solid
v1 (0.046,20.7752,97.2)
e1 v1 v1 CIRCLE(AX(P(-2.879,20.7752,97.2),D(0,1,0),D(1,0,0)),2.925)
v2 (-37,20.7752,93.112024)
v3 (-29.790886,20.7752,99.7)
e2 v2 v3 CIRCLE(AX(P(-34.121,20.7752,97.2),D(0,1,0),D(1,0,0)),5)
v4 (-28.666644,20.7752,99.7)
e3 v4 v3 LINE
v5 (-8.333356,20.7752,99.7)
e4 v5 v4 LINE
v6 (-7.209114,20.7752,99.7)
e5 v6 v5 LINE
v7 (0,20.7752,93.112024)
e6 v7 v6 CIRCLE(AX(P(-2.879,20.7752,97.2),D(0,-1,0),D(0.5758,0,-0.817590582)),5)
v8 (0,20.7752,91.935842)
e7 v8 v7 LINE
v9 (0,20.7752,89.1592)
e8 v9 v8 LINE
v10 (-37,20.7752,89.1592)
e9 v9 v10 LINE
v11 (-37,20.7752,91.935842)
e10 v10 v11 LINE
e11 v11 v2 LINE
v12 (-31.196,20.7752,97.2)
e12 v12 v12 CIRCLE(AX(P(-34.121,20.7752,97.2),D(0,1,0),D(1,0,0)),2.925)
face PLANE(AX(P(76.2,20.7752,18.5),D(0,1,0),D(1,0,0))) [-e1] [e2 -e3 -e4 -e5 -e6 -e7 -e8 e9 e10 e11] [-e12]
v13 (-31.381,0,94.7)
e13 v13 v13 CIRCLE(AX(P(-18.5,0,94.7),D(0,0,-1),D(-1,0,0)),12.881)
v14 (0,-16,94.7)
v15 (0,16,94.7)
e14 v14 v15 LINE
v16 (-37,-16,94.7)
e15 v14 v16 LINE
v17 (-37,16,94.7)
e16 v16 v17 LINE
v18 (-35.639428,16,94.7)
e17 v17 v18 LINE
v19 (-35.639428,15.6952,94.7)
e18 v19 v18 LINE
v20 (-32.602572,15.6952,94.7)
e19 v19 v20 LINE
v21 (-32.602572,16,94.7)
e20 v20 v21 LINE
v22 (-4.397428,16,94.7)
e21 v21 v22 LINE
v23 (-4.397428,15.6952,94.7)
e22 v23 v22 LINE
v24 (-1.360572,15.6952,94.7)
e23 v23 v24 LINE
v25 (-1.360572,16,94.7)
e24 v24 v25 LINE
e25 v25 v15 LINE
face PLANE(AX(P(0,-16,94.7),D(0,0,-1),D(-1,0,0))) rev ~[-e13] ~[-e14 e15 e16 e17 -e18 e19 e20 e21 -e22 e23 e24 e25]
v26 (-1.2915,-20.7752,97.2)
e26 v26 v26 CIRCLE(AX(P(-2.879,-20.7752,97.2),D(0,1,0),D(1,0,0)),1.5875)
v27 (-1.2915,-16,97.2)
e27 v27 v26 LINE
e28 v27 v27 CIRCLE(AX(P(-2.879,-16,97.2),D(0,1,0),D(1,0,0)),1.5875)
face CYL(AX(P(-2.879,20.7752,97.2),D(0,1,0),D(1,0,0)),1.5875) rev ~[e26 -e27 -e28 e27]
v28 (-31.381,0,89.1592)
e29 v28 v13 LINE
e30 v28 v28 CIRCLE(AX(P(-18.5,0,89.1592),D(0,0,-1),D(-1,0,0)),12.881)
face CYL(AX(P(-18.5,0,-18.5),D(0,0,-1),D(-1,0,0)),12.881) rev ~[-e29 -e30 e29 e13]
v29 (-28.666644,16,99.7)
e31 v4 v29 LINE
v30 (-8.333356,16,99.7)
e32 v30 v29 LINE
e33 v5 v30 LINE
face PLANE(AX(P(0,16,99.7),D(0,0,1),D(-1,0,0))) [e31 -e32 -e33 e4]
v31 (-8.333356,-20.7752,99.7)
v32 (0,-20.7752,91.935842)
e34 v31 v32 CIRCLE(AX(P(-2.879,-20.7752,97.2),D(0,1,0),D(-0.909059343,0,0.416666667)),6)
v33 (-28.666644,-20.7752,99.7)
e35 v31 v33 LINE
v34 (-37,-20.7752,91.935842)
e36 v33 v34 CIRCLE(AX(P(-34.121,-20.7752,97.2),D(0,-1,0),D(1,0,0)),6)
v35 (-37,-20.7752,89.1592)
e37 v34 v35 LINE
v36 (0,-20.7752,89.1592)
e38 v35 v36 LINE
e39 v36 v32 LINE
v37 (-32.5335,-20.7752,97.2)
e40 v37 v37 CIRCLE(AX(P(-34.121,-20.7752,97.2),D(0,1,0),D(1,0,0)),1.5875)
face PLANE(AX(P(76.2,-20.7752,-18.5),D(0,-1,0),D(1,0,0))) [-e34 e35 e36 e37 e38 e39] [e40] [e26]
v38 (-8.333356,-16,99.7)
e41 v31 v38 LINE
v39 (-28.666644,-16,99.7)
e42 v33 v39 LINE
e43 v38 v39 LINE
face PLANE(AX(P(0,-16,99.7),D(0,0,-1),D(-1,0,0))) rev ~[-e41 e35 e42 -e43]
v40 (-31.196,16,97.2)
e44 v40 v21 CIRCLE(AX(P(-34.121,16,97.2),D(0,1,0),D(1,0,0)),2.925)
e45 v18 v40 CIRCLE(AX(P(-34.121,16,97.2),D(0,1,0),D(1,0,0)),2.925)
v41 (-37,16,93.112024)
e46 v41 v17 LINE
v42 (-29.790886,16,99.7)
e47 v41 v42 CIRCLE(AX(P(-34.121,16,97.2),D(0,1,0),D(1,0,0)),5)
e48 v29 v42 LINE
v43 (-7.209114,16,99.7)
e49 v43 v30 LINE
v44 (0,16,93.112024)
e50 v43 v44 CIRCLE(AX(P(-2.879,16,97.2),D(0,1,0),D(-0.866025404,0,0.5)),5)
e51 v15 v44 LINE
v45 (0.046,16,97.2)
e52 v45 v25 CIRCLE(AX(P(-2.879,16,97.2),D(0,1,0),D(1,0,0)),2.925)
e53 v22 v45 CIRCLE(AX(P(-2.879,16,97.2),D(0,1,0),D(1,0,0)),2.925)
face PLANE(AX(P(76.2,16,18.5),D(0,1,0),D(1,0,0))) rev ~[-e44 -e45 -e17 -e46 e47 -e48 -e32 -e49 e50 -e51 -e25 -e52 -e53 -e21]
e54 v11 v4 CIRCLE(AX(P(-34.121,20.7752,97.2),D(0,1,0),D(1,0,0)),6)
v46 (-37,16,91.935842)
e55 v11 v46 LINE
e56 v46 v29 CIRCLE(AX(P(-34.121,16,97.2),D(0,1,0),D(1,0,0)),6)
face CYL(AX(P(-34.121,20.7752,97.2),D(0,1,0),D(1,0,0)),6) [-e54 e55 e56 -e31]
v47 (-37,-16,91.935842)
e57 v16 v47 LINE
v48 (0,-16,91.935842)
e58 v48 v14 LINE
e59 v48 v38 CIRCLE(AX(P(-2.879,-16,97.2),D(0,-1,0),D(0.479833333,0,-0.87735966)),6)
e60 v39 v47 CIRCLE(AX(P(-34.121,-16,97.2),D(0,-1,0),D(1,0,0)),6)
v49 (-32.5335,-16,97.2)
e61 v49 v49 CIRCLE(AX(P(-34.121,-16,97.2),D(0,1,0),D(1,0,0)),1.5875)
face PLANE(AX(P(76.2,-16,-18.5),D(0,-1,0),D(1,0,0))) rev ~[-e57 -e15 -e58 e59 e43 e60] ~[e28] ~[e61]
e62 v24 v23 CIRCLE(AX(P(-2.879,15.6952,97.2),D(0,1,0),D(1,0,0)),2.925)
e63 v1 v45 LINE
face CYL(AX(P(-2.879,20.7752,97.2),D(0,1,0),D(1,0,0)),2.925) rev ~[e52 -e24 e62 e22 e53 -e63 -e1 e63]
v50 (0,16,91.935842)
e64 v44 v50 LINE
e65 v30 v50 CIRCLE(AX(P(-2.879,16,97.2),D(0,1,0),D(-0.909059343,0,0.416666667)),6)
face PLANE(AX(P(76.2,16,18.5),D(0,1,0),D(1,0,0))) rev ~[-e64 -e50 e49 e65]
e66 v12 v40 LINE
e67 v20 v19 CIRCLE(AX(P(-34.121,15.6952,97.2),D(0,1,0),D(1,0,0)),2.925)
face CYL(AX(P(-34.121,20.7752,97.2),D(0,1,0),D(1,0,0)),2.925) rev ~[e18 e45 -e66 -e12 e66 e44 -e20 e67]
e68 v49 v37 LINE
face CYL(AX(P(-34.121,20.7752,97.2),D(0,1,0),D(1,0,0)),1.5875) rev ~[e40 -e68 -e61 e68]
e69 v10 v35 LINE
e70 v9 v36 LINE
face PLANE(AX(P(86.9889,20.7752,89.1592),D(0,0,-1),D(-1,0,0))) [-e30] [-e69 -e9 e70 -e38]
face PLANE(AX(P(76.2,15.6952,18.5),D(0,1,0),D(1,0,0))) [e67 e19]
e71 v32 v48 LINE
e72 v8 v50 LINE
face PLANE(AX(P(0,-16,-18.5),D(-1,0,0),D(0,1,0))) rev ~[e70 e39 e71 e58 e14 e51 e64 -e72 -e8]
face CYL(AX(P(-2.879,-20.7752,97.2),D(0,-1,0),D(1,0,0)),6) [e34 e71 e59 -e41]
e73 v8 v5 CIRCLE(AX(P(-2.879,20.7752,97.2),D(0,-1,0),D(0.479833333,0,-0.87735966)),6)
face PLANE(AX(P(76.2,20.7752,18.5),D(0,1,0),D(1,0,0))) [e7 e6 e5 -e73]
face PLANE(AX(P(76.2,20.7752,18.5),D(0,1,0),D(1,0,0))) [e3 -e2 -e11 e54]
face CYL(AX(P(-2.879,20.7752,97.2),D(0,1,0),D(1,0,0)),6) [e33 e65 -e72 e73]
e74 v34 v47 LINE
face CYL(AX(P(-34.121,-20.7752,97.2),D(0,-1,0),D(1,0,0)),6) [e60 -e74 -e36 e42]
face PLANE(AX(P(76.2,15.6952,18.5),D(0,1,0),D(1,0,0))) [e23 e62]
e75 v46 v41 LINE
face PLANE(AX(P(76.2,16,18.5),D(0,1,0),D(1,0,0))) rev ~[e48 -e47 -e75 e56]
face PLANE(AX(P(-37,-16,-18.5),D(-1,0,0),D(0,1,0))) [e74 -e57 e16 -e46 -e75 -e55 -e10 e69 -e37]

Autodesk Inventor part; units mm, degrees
ref_plane "YZ Plane" through (0, 0, 0) normal (1, 0, 0) x (0, 1, 0)
ref_plane "XZ Plane" through (0, 0, 0) normal (0, 1, 0) x (-1, 0, 0)
ref_plane "XY Plane" through (0, 0, 0) normal (0, 0, 1) x (1, 0, 0)
sketch "Sketch2" plane through (0, 0, 0) normal (1, 0, 0) x (0, 1, 0)
  circle A0 centre (0, 0) radius 12.881
  line L0 (-16, -18.5) -> (16, -18.5)
  line L1 (16, -18.5) -> (16, 18.5)
  line L2 (16, 18.5) -> (-16, 18.5)
  line L3 (-16, 18.5) -> (-16, -18.5)
  line L4 (-16, -18.5) -> (16, 18.5) construction
  line L5 (16, -18.5) -> (-16, 18.5) construction
  dimension "d9" = 25.762
  dimension "d10" = 32
  dimension "d11" = 37
extrude "Extrusion2" add sketch "Sketch2" along normal blind 76.2
sketch "Sketch3" plane through (0, -16, -18.5) normal (0, 0, -1) x (-1, 0, 0)
  line L0 (0, 0) -> (0, 32) projected
  circle A0 centre (18.5, 16) radius 12.881
  line L1 (0, 32) -> (0, 0)
  line L2 (0, 0) -> (37, 0)
  line L3 (37, 0) -> (37, 32)
  line L4 (37, 32) -> (0, 32)
  line L5 (0, 32) -> (37, 0) construction
  line L6 (0, 0) -> (37, 32) construction
  point P0 (0, 16)
  dimension "d14" = 25.762
  dimension "d15" = 32
  dimension "d16" = 37
extrude "Extrusion3" add sketch "Sketch3" against normal blind 113.2
sketch "Sketch4" plane through (76.2, -16, -18.5) normal (0, 0, -1) x (-1, 0, 0)
  circle A0 centre (94.7, 16) radius 12.881 projected
  point P0 (76.2, 16)
extrude "Extrusion4" add sketch "Sketch4" against normal blind 37
sketch "Sketch5" plane through (76.2, 16, 18.5) normal (0, 1, 0) x (1, 0, 0)
  line L0 (-113.2, 37) -> (0, 37) projected
  line L1 (-113.2, 37) -> (-113.2, -76.2) projected
  line L2 (-113.2, 37) -> (-100.1185, 50.0815)
  line L3 (-113.2, 37) -> (-94.7, 37) construction
  line L4 (-113.2, 37) -> (-126.2815, 23.9185)
  line L5 (-113.2, 37) -> (-94.7, 37) construction
  line L6 (-100.1185, 50.0815) -> (-154.0001, 103.963)
  line L7 (-126.2815, 23.9185) -> (-180.163, 77.8001)
  line L8 (-126.2815, 23.9185) -> (-50.0815, 23.9185) construction
  line L9 (-154.0001, 103.963) -> (-180.163, 77.8001)
  line L10 (-100.1185, 50.0815) -> (-87.037, 37)
  line L11 (-126.2815, 23.9185) -> (-113.2, 10.837)
  point P0 (-76.2, 18.5)
  dimension "d21" = 18.5
  dimension "d22" = 45
  dimension "d23" = 18.5
  dimension "d24" = 135
  dimension "d25" = 76.2
  dimension "d26" = 76.2
  dimension "d27" = 135
extrude "Extrusion5" add sketch "Sketch5" against normal blind 32
sketch "Sketch7" plane through (-77.8001, -16, -85.463) normal (-0.7071068, 0, -0.7071068) x (-0.7071068, 0, 0.7071068)
  line L0 (36.4256, 0.4968) -> (36.4256, 31.5032)
  line L1 (36.4256, 31.5032) -> (0.5744, 31.5032)
  line L2 (0.5744, 31.5032) -> (0.5744, 0.4968)
  line L3 (0.5744, 0.4968) -> (36.4256, 0.4968)
  circle A0 centre (18.5, 16) radius 12.881
  point P0 (5.4185, 16)
  point P1 (36.4256, 16)
  dimension "d131" = 25.762
extrude "Extrusion6" cut sketch "Sketch7" against normal blind 101.6 contours A0
sketch "Sketch8" plane through (76.2, 16, 18.5) normal (0, 1, 0) x (1, 0, 0)
  line L0 (-76.2, 0) -> (0, 0) projected
  line L1 (-87.037, 37) -> (0, 37) projected
  line L2 (-87.037, 37) -> (-154.0001, 103.963) projected
  line L3 (-180.163, 77.8001) -> (-113.2, 10.837) projected
  line L4 (-113.2, 10.837) -> (-113.2, -76.2) projected
  line L5 (-76.2, 0) -> (-76.2, -76.2) projected
  line L6 (0, 37) -> (5, 37)
  line L7 (5, 37) -> (5, 0)
  line L8 (5, 0) -> (0, 0)
  line L9 (0, 0) -> (0, 37)
  line L10 (-113.2, -76.2) -> (-76.2, -76.2)
  line L11 (-76.2, -76.2) -> (-76.2, -81.2)
  line L12 (-76.2, -81.2) -> (-113.2, -81.2)
  line L13 (-113.2, -81.2) -> (-113.2, -76.2)
  line L14 (-180.163, 77.8001) -> (-183.6985, 81.3356)
  line L15 (-183.6985, 81.3356) -> (-157.5356, 107.4985)
  line L16 (-157.5356, 107.4985) -> (-154.0001, 103.963)
  point P0 (-76.2, 18.5)
  dimension "d32" = 5
  dimension "d33" = 5
  dimension "d34" = 5
  dimension "d35" = 90
extrude "Extrusion7" add sketch "Sketch8" along normal blind 4.7752
sketch "Sketch9" plane through (76.2, -16, -18.5) normal (0, -1, 0) x (1, 0, 0)
  line L0 (-87.037, 0) -> (0, 0) projected
  line L1 (-76.2, 37) -> (0, 37) projected
  line L2 (-76.2, 37) -> (-76.2, 113.2) projected
  line L3 (-113.2, 26.163) -> (-113.2, 113.2) projected
  line L4 (-113.2, 26.163) -> (-180.163, -40.8001) projected
  line L5 (-154.0001, -66.963) -> (-87.037, 0) projected
  line L6 (-76.2, 118.2) -> (-76.2, 37) projected
  line L7 (-113.2, 113.2) -> (-76.2, 113.2)
  line L8 (-76.2, 113.2) -> (-76.2, 118.2)
  line L9 (-76.2, 118.2) -> (-113.2, 118.2)
  line L10 (-113.2, 118.2) -> (-113.2, 113.2)
  line L11 (-76.2, 37) -> (5, 37) projected
  line L12 (0, 0) -> (5, 0)
  line L13 (5, 0) -> (5, 37)
  line L14 (5, 37) -> (0, 37)
  line L15 (0, 37) -> (0, 0)
  line L16 (-183.6985, -44.3356) -> (-113.2, 26.163) projected
  line L17 (-180.163, -40.8001) -> (-183.6985, -44.3356)
  line L18 (-183.6985, -44.3356) -> (-157.5356, -70.4985)
  line L19 (-157.5356, -70.4985) -> (-154.0001, -66.963)
  point P0 (-76.2, 18.5)
extrude "Extrusion8" add sketch "Sketch9" along normal blind 4.7752
sketch "Sketch10" plane through (76.2, 20.7752, 18.5) normal (0, 1, 0) x (1, 0, 0)
  circle A0 centre (2.5, 34.4385) radius 1.5875
  circle A1 centre (2.5, 2.5615) radius 1.5875
  line L0 (0, 37.0615) -> (0, 0.0615)
  line L1 (0, 0.0615) -> (5, 0.0615)
  line L2 (5, 37.0615) -> (5, 0.0615)
  line L3 (0, 37.0615) -> (5, 37.0615)
  line L4 (5, 0) -> (5, 37) projected
  line L5 (0, 18.5) -> (5, 18.5)
  point P0 (-76.2, 18.5)
  dimension "d143" = 15.9385
  dimension "d144" = 2.5
  dimension "d145" = 2.5
  dimension "d146" = 15.9385
extrude "Extrusion9" cut sketch "Sketch10" against normal blind 279.4 contours A0 | A1
sketch "Sketch11" plane through (76.2, 20.7752, 18.5) normal (0, 1, 0) x (1, 0, 0)
  circle A0 centre (-79.079, -78.7) radius 1.5875
  circle A1 centre (-110.321, -78.7) radius 1.5875
  line L0 (-76.579, -76.2) -> (-113.579, -76.2)
  line L1 (-113.579, -76.2) -> (-113.579, -81.2)
  line L2 (-76.579, -81.2) -> (-113.579, -81.2)
  line L3 (-76.579, -76.2) -> (-76.579, -81.2)
  circle A2 centre (-157.6226, 103.876) radius 1.778
  circle A3 centre (-180.163, 81.3356) radius 1.778
  line L4 (-157.5791, 107.4551) -> (-183.742, 81.2921)
  line L5 (-183.742, 81.2921) -> (-180.2065, 77.7566)
  line L6 (-154.0435, 103.9195) -> (-180.2065, 77.7566)
  line L7 (-157.5791, 107.4551) -> (-154.0435, 103.9195)
  line L8 (-157.5356, 107.4985) -> (-183.6985, 81.3356) projected
  line L9 (-170.6606, 94.3736) -> (-167.125, 90.838)
  line L10 (-113.2, -81.2) -> (-76.2, -81.2) projected
  line L11 (-94.7, -76.2) -> (-94.7, -81.2)
  point P0 (-76.2, 18.5)
  dimension "d147" = 2.5
  dimension "d148" = 2.5
  dimension "d149" = 15.9385
  dimension "d150" = 15.9385
  dimension "d151" = 2.5
  dimension "d152" = 2.5
  dimension "d153" = 15.621
  dimension "d154" = 15.621
  dimension "d175" = 3.556
  dimension "d176" = 3.556
extrude "Extrusion10" cut sketch "Sketch11" against normal blind 279.4 contours A0 | A1 | A2 | A3
fillet "Fillet1" radius 3.175 3 edges at (-10.837, 0, -18.5) (0, 0, 18.5) (-37, 0, 7.663)
sketch "Sketch13" plane through (76.2, 20.7752, 18.5) normal (0, 1, 0) x (1, 0, 0)
  line L0 (-157.5356, 107.4985) -> (-183.6985, 81.3356) projected
  line L1 (-113.2, -81.2) -> (-76.2, -81.2) projected
  line L2 (5, 0) -> (5, 37) projected
  line L3 (5, 37) -> (5, 0) projected
  line L4 (5, 18.5) -> (-120.863, 18.5)
  line L5 (-114.1299, 11.767) -> (-183.6985, 81.3356) projected
  line L6 (-76.2, -81.2) -> (-113.2, -81.2) projected
  line L7 (-94.7, -81.2) -> (-95.2395, 19.0395)
  line L8 (-104.3477, 9.9312) -> (-86.1312, 28.1477) projected
  line L9 (-95.2395, 19.0395) -> (-170.6171, 94.4171)
  line L10 (-183.6985, 81.3356) -> (-157.5356, 107.4985) projected
  circle A0 centre (-14.05, 18.5) radius 6.35
  circle A1 centre (-39.45, 18.5) radius 6.35
  circle A2 centre (-64.85, 18.5) radius 6.35
  circle A3 centre (-90.25, 18.5) radius 6.35
  circle A4 centre (-94.8025, -62.15) radius 6.35
  circle A5 centre (-94.9392, -36.7504) radius 6.35
  circle A6 centre (-95.0759, -11.3507) radius 6.35
  circle A7 centre (-95.2126, 14.0489) radius 6.35
  circle A8 centre (-157.1467, 80.9467) radius 6.35
  circle A9 centre (-139.1862, 62.9862) radius 6.35
  circle A10 centre (-121.2257, 45.0257) radius 6.35
  circle A11 centre (-103.2651, 27.0651) radius 6.35
  point P0 (-76.2, 18.5)
  point P1 (-95.1101, -5.0008)
  point P2 (-95.0418, -17.7006)
  point P3 (-94.9734, -30.4005)
  point P4 (-94.9051, -43.1003)
  dimension "d60" = 12.7
  dimension "d61" = 19.05
  dimension "d64" = 25.4
  dimension "d69" = 12.7
  dimension "d70" = 19.05
  dimension "d73" = 25.4
  dimension "d78" = 12.7
  dimension "d79" = 19.05
  dimension "d82" = 25.4
extrude "Extrusion12" cut sketch "Sketch13" against normal blind 127 contours A8 L9 | L9 A8 | A9 L9 | L9 A9 | A11 L9 | L9 A11 | A10 L9 | L9 A10 | A0 L4 | L4 A0 | A1 L4 | L4 A1 | A2 L4 | L4 A2 | A4 L7 | L7 A4 | A5 L7 | L7 A5 | A6 L7 | L7 A6
sketch "Sketch14" plane through (81.2, 16, -18.5) normal (0, 0, -1) x (-1, 0, 0)
  line L0 (0, 4.7752) -> (90.7219, 4.7752) projected
  line L1 (0, 0) -> (0, 4.7752) projected
  circle A0 centre (19.05, -16) radius 6.35
  circle A1 centre (44.45, -16) radius 6.35
  circle A2 centre (69.85, -16) radius 6.35
  point P0 (81.2, -16)
  dimension "d89" = 12.7
  dimension "d91" = 19.05
  dimension "d94" = 25.4
extrude "Extrusion13" cut sketch "Sketch14" against normal blind 50.8
sketch "Sketch15" plane through (-37, 16, 94.7) normal (-1, 0, 0) x (0, 0, 1)
  line L0 (5, 0) -> (5, 4.7752) projected
  line L1 (-85.7219, 4.7752) -> (5, 4.7752) projected
  circle A0 centre (-14.05, -16) radius 6.35
  circle A1 centre (-39.45, -16) radius 6.35
  circle A2 centre (-64.85, -16) radius 6.35
  point P0 (-94.7, -16)
  dimension "d101" = 12.7
  dimension "d102" = 19.05
  dimension "d105" = 25.4
extrude "Extrusion14" cut sketch "Sketch15" against normal blind 50.8
sketch "Sketch16" plane through (-107.4985, 16, -62.8356) normal (-0.7071068, 0, 0.7071068) x (0.7071068, 0, 0.7071068)
  line L0 (0, 4.7752) -> (98.3849, 4.7752) projected
  line L1 (0, 0) -> (0, 4.7752) projected
  circle A0 centre (19.05, -16) radius 6.35
  circle A1 centre (44.45, -16) radius 6.35
  circle A2 centre (69.85, -16) radius 6.35
  point P0 (120.4444, -16)
  dimension "d112" = 12.7
  dimension "d113" = 19.05
  dimension "d116" = 25.4
extrude "Extrusion15" cut sketch "Sketch16" against normal blind 101.6
sketch "Sketch19" plane through (76.2, 20.7752, 18.5) normal (0, 1, 0) x (1, 0, 0)
  circle A0 centre (-157.6226, 103.876) radius 1.778 projected
  circle A1 centre (-79.079, -78.7) radius 1.5875 projected
  circle A2 centre (-180.163, 81.3356) radius 1.778 projected
  circle A3 centre (-110.321, -78.7) radius 1.5875 projected
  circle A4 centre (2.5, 2.5615) radius 1.5875 projected
  circle A5 centre (2.5, 34.4385) radius 1.5875 projected
  line L0 (-87.967, 37.9299) -> (-157.5356, 107.4985) projected
  line L1 (-157.5356, 107.4985) -> (-183.6985, 81.3356) projected
  line L2 (-183.6985, 81.3356) -> (-114.1299, 11.767) projected
  line L3 (-113.2, 9.5219) -> (-113.2, -81.2) projected
  line L4 (-113.2, -81.2) -> (-76.2, -81.2) projected
  line L5 (-76.2, -81.2) -> (-76.2, -3.175) projected
  line L6 (-73.025, 0) -> (5, 0) projected
  line L7 (5, 0) -> (5, 37) projected
  line L8 (5, 37) -> (-85.7219, 37) projected
  circle A6 centre (2.5, 2.5615) radius 5
  circle A7 centre (2.5, 34.4385) radius 5
  circle A8 centre (-110.321, -78.7) radius 5
  circle A9 centre (-79.079, -78.7) radius 5
  circle A10 centre (-180.163, 81.3356) radius 5
  circle A11 centre (-157.6226, 103.876) radius 5
  point P0 (-76.2, 18.5)
  point P1 (-76.2, -74.612)
  point P2 (-83.4091, -81.2)
  point P3 (-113.2, -74.612)
  point P4 (-105.9909, -81.2)
  point P5 (-178.8689, 86.1652)
  point P6 (-178.8689, 76.506)
  point P7 (-152.7579, 102.7208)
  point P8 (-162.4522, 102.5819)
  point P9 (5, 6.8916)
  point P10 (-1.794, 0)
  point P11 (-1.794, 37)
  point P12 (5, 30.1084)
  dimension "d132" = 10
  dimension "d133" = 10
  dimension "d134" = 10
  dimension "d135" = 10
  dimension "d136" = 10
  dimension "d137" = 10
extrude "Extrusion17" add sketch "Sketch19" against normal blind 4.7752 contours L0 L1 A11 | L1 L2 A10 | L3 L4 A8 | L4 L5 A9 | L6 L7 A6 | L7 L8 A7 picked at (-160.8698, 104.621) picked at (-180.881, 84.6119) picked at (-108.6315, -81.5172) picked at (-80.7689, -81.5168) picked at (0.7108, -0.3118) picked at (0.7108, 37.3118)
sketch "Sketch20" plane through (76.2, -20.7752, -18.5) normal (0, -1, 0) x (1, 0, 0)
  circle A0 centre (-157.6226, -66.876) radius 1.778 projected
  circle A1 centre (-180.163, -44.3356) radius 1.778 projected
  circle A2 centre (2.5, 34.4385) radius 1.5875 projected
  circle A3 centre (2.5, 2.5615) radius 1.5875 projected
  line L0 (-157.5356, -70.4985) -> (-87.967, -0.9299) projected
  line L1 (-85.7219, 0) -> (5, 0) projected
  line L2 (5, 0) -> (5, 37) projected
  line L3 (5, 37) -> (-73.025, 37) projected
  line L4 (-76.2, 40.175) -> (-76.2, 118.2) projected
  line L5 (-76.2, 118.2) -> (-113.2, 118.2) projected
  line L6 (-113.2, 118.2) -> (-113.2, 27.4781) projected
  line L7 (-114.1299, 25.233) -> (-183.6985, -44.3356) projected
  line L8 (-183.6985, -44.3356) -> (-157.5356, -70.4985) projected
  circle A4 centre (-157.6226, -66.876) radius 5
  circle A5 centre (-180.163, -44.3356) radius 5
  circle A6 centre (-110.321, 115.7) radius 1.5875 projected
  circle A7 centre (-110.321, 115.7) radius 6
  circle A8 centre (-79.079, 115.7) radius 1.5875 projected
  circle A9 centre (-79.079, 115.7) radius 6
  circle A10 centre (2.5, 34.4385) radius 5
  circle A11 centre (2.5, 2.5615) radius 5
  point P0 (-76.2, 18.5)
  point P1 (5, 6.8916)
  point P2 (-1.794, 0)
  point P3 (-1.794, 37)
  point P4 (5, 30.1084)
  point P5 (-84.5334, 118.2)
  point P6 (-76.2, 110.4358)
  point P7 (-104.8666, 118.2)
  point P8 (-113.2, 110.4358)
  point P9 (-162.4522, -65.5819)
  point P10 (-152.7579, -65.7208)
  point P11 (-178.8689, -39.506)
  point P12 (-178.8689, -49.1652)
  dimension "d173" = 12
  dimension "d174" = 12
extrude "Extrusion18" add sketch "Sketch20" against normal blind 4.7752 contours L0 A4 L8 | L1 L2 A11 | L2 L3 A10 | L4 L5 A9 | L5 L6 A7 | L7 L8 A5 picked at (-160.8698, -67.621) picked at (0.7108, -0.3118) picked at (0.7108, 37.3118) picked at (-81.4972, 118.6185) picked at (-107.8901, 118.6026) picked at (-180.881, -47.6119)
sketch "Sketch21" plane through (76.2, 20.7752, 18.5) normal (0, 1, 0) x (1, 0, 0)
  circle A0 centre (-79.079, -78.7) radius 1.5875 projected
  circle A1 centre (-110.321, -78.7) radius 1.5875 projected
  circle A2 centre (2.5, 2.5615) radius 1.5875 projected
  circle A3 centre (2.5, 34.4385) radius 1.5875 projected
  arc A4 (-152.7579, 102.7208) -> (-162.4522, 102.5819) centre (-157.6226, 103.876) ccw projected
  arc A5 (-178.8689, 86.1652) -> (-178.8689, 76.506) centre (-180.163, 81.3356) ccw projected
  arc A6 (-113.2, -74.612) -> (-105.9909, -81.2) centre (-110.321, -78.7) ccw projected
  circle A7 centre (-110.321, -78.7) radius 2.8
  circle A8 centre (-79.079, -78.7) radius 1.5875 projected
  circle A9 centre (-79.079, -78.7) radius 2.8
  circle A10 centre (2.5, 34.4385) radius 1.5875 projected
  circle A11 centre (2.5, 34.4385) radius 2.8
  circle A12 centre (2.5, 2.5615) radius 1.5875 projected
  circle A13 centre (2.5, 2.5615) radius 2.8
  circle A14 centre (-157.6226, 103.876) radius 2.8
  circle A15 centre (-180.163, 81.3356) radius 2.8
  point P0 (-76.2, 18.5)
  dimension "d155" = 5.6
  dimension "d156" = 5.6
  dimension "d157" = 5.6
  dimension "d158" = 5.6
  dimension "d159" = 5.6
  dimension "d160" = 5.6
extrude "Extrusion19" cut sketch "Sketch21" against normal blind 4.7752
sketch "Sketch22" plane through (76.2, 20.7752, 18.5) normal (0, 1, 0) x (1, 0, 0)
  circle A0 centre (-103.2651, 27.0651) radius 6.35 projected
  circle A1 centre (-14.05, 18.5) radius 6.35 projected
  circle A2 centre (-94.8025, -62.15) radius 6.35 projected
  circle A3 centre (-157.1467, 80.9467) radius 6.35 projected
  circle A4 centre (-95.0759, -11.3507) radius 6.35 projected
  circle A5 centre (-121.2257, 45.0257) radius 6.35 projected
  circle A6 centre (-39.45, 18.5) radius 6.35 projected
  circle A7 centre (-64.85, 18.5) radius 6.35 projected
  circle A8 centre (-139.1862, 62.9862) radius 6.35 projected
  circle A9 centre (-94.9392, -36.7504) radius 6.35 projected
  line L0 (-192.0238, 124.49) -> (10.7889, 124.49)
  line L1 (10.7889, 124.49) -> (10.7889, -70.6592)
  line L2 (10.7889, -70.6592) -> (-192.0238, -70.6592)
  line L3 (-192.0238, -70.6592) -> (-192.0238, 124.49)
  point P0 (-76.2, 18.5)
extrude "Extrusion20" cut sketch "Sketch22" against normal blind 50.8
sketch "Sketch23" plane through (76.2, 20.7752, 18.5) normal (0, 1, 0) x (1, 0, 0)
  circle A0 centre (-110.321, -78.7) radius 2.8 projected
  circle A1 centre (-79.079, -78.7) radius 2.8 projected
  circle A2 centre (-110.321, -78.7) radius 2.925
  circle A3 centre (-79.079, -78.7) radius 2.925
  point P0 (-76.2, 18.5)
  dimension "d165" = 5.85
  dimension "d166" = 5.85
extrude "Extrusion21" cut sketch "Sketch23" against normal blind 5.08 contours A0 | A1 | A2 | A3
sketch "Sketch24" plane through (76.2, 20.7752, 18.5) normal (0, 1, 0) x (1, 0, 0)
  line L0 (-113.2, -70.6592) -> (-113.2, -74.612) projected
  arc A0 (-113.2, -74.612) -> (-105.9909, -81.2) centre (-110.321, -78.7) ccw projected
  line L1 (-105.9909, -81.2) -> (-83.4091, -81.2) projected
  arc A1 (-83.4091, -81.2) -> (-76.2, -74.612) centre (-79.079, -78.7) ccw projected
  line L2 (-76.2, -74.612) -> (-76.2, -70.6592) projected
  circle A2 centre (-110.321, -78.7) radius 6
  circle A3 centre (-79.079, -78.7) radius 6
  point P0 (-76.2, 18.5)
  point P1 (-84.5334, -81.2)
  point P2 (-76.2, -73.4358)
  point P3 (-113.2, -73.4358)
  point P4 (-104.8666, -81.2)
  dimension "d169" = 12
  dimension "d170" = 12
extrude "Extrusion22" add sketch "Sketch24" against normal blind 4.7752 contours L0 A0 L1 A2 | L1 A1 L2 A3 picked at (-105.4871, -81.6026) picked at (-73.5184, -79.5754)
properties part number "testPrintBracketV3"
